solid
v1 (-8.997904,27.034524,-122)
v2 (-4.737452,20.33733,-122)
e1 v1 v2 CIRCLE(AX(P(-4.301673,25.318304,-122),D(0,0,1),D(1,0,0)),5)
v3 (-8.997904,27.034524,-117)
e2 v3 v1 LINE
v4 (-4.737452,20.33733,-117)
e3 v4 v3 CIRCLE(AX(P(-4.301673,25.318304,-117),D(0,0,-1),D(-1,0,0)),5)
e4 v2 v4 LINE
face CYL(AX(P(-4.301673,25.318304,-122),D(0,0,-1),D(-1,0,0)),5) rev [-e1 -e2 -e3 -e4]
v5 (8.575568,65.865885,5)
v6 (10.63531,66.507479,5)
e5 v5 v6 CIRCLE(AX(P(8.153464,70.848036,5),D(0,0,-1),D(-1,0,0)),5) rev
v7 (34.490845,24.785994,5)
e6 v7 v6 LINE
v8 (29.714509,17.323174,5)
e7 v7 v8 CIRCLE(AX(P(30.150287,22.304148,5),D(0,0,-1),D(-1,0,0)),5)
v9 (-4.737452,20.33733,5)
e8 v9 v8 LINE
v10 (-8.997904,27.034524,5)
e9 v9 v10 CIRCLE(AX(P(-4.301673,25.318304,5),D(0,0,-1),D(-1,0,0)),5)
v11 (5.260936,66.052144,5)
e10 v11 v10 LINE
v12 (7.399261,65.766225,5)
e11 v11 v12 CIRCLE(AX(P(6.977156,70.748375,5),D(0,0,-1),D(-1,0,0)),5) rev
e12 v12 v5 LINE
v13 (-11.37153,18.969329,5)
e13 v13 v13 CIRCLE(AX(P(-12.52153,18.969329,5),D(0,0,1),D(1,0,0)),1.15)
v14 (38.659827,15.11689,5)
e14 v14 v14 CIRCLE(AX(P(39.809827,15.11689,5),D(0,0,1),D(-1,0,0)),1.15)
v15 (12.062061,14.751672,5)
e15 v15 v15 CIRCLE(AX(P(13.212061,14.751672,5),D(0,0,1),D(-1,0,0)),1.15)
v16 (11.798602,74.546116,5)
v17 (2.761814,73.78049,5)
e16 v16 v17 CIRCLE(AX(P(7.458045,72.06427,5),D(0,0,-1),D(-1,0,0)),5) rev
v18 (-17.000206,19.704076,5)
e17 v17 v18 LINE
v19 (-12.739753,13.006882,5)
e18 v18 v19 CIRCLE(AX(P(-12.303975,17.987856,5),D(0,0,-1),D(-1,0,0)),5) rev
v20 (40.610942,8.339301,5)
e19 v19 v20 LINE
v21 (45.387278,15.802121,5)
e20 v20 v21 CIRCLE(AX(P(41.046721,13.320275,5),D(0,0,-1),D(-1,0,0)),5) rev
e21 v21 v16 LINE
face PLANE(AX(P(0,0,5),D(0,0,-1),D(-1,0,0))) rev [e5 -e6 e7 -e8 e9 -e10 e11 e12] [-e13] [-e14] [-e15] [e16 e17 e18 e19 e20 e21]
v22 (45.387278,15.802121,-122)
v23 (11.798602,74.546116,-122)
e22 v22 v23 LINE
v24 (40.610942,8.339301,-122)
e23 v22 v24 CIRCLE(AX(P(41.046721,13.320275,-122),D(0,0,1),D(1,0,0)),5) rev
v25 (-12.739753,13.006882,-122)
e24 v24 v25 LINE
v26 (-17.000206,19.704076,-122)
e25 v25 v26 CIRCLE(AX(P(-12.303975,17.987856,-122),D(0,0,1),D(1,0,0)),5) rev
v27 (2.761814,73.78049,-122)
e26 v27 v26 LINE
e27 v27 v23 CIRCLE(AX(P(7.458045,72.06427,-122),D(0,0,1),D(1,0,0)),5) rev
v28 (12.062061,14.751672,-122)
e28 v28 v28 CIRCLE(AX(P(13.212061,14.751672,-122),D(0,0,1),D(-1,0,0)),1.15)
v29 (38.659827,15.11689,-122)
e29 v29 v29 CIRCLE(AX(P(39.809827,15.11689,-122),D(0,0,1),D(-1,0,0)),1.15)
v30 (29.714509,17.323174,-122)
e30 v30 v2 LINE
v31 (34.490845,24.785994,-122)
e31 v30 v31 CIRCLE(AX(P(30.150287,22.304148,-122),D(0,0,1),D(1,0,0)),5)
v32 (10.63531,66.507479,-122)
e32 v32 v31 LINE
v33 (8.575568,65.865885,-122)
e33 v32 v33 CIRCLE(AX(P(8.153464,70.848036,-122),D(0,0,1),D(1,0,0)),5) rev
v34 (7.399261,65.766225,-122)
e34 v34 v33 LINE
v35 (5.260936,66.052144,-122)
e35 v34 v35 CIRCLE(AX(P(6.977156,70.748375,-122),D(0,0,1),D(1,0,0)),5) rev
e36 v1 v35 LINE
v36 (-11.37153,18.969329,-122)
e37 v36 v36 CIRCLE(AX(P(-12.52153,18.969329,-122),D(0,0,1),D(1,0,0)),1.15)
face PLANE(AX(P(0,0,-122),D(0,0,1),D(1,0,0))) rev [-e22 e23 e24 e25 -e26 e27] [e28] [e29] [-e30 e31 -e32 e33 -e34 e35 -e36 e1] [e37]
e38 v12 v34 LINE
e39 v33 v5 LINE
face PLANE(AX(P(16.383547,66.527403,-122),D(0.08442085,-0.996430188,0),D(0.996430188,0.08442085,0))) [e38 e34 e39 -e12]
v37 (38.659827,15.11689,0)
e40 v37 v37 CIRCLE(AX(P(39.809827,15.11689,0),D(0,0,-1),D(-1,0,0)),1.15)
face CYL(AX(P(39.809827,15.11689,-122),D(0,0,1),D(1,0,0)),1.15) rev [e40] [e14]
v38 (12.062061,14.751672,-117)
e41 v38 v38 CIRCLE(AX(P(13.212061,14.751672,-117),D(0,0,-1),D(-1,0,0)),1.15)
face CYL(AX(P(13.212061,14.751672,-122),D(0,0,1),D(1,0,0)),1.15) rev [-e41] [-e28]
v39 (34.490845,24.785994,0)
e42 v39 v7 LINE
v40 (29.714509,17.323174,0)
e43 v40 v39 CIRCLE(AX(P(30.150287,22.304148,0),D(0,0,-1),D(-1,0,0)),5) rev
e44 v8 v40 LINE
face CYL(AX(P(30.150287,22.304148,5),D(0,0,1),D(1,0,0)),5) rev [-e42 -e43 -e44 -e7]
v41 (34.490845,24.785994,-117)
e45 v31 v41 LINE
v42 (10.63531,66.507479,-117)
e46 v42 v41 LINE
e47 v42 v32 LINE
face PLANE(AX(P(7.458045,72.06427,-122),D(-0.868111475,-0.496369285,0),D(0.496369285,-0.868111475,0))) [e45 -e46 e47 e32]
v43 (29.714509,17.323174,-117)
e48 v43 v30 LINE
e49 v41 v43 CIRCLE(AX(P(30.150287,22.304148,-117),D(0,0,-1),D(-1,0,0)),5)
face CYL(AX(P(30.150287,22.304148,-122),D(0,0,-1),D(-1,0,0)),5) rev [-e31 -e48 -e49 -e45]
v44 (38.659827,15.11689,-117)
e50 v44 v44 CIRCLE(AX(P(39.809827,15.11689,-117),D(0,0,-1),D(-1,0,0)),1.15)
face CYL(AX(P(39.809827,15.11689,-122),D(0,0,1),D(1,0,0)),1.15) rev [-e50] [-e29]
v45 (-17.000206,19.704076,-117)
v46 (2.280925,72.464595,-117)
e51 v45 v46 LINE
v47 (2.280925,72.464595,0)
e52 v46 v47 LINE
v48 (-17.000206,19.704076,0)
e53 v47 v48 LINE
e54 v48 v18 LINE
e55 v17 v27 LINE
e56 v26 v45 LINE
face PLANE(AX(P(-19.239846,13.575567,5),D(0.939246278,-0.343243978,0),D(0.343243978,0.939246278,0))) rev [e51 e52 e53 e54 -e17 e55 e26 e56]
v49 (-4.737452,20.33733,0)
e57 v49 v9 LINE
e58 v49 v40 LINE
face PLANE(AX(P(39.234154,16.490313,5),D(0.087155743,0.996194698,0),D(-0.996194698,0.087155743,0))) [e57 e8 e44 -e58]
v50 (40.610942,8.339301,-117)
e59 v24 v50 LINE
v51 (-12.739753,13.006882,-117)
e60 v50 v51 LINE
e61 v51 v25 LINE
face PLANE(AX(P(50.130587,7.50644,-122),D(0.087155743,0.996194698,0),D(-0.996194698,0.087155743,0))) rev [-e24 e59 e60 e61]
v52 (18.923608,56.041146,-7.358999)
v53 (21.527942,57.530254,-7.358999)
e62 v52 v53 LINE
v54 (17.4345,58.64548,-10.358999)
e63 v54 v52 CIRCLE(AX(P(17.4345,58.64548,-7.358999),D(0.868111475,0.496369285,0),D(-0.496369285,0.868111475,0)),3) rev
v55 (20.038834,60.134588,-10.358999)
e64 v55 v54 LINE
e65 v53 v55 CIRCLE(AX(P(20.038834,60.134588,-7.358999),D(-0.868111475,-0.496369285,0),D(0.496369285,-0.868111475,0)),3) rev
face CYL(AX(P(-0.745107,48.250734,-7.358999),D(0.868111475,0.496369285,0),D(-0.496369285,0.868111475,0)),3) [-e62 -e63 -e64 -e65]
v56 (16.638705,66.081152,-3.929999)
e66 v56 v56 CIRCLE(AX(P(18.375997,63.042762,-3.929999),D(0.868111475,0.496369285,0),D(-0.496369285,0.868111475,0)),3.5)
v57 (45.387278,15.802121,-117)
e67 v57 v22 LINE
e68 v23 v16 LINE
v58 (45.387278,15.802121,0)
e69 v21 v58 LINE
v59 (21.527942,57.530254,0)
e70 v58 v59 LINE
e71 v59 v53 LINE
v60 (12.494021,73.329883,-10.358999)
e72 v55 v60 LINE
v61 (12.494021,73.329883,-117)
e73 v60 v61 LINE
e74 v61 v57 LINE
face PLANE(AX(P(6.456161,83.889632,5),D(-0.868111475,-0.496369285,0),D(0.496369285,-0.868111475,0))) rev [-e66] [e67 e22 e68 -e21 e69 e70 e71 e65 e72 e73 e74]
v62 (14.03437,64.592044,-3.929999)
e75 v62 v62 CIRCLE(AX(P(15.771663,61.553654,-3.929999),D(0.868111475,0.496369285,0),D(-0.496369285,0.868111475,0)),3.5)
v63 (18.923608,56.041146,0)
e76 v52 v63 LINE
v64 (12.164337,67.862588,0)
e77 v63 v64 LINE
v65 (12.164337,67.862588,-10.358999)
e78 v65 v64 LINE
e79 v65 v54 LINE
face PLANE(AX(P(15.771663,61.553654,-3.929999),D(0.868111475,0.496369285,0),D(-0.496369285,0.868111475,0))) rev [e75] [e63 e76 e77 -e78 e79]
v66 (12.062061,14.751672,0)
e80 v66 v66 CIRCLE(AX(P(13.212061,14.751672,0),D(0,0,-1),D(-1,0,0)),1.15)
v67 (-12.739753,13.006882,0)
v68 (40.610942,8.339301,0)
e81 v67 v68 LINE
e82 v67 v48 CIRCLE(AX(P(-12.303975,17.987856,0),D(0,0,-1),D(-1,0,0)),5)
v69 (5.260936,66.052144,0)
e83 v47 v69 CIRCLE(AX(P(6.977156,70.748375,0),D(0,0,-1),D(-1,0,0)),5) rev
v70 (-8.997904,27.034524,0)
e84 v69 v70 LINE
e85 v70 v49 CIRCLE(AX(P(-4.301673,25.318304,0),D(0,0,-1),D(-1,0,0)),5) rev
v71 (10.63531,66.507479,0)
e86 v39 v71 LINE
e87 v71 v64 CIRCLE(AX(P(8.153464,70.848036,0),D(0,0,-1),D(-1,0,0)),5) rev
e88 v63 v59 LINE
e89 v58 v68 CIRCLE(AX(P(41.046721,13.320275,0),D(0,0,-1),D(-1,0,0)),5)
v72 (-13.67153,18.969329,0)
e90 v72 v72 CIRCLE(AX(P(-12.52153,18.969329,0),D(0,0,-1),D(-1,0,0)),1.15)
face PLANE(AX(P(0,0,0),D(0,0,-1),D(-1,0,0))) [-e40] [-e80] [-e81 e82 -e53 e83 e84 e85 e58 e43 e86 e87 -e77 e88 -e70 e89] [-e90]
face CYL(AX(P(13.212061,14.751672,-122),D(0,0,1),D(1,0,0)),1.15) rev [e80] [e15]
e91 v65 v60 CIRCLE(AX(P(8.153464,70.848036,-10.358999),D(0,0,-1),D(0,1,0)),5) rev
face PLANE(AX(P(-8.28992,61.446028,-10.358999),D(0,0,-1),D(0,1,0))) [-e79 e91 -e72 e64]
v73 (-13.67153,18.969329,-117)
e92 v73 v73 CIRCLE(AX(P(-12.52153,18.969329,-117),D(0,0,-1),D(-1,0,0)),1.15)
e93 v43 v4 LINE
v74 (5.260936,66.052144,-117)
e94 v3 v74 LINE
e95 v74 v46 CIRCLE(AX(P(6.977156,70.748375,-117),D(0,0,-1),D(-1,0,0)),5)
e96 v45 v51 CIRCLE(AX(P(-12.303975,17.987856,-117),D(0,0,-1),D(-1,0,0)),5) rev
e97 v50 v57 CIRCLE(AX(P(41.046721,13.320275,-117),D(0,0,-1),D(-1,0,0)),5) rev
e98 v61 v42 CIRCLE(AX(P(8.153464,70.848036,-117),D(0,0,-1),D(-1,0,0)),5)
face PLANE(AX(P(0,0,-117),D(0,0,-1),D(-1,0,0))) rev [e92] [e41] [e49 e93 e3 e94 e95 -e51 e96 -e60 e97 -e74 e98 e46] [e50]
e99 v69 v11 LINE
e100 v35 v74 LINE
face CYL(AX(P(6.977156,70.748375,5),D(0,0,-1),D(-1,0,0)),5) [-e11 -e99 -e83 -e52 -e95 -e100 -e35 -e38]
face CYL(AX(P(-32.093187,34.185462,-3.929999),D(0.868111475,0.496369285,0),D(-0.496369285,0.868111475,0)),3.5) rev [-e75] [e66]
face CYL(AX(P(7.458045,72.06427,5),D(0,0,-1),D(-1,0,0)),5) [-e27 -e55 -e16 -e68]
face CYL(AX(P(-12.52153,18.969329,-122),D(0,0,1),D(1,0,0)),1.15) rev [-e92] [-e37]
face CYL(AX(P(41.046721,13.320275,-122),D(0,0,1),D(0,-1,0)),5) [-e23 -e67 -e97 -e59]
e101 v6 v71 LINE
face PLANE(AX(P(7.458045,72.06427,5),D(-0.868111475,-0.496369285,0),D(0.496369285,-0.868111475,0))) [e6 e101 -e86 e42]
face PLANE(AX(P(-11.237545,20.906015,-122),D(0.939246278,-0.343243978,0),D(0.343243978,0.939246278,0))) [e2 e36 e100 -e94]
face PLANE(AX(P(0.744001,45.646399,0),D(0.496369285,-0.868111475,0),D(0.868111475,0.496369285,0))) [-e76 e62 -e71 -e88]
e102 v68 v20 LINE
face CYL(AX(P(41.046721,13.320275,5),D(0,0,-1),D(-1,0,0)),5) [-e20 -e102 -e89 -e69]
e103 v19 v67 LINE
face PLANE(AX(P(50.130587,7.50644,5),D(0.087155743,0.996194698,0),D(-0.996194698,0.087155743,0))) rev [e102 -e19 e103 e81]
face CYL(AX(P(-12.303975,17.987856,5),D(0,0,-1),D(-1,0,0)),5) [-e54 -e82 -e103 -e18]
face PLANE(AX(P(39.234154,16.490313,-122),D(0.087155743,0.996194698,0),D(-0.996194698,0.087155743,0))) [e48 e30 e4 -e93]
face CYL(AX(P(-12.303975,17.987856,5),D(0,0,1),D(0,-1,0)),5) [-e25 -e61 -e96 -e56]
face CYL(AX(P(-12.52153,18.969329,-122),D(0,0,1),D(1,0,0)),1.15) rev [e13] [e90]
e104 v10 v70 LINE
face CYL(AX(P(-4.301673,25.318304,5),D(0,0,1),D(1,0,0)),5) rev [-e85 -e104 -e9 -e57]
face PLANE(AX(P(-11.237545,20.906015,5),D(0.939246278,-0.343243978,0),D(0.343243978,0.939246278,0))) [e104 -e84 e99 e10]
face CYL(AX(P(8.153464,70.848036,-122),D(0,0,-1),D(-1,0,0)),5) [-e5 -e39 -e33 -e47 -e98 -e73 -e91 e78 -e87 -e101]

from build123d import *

# Parameters (mm, degrees)
AUFSATZ_LINEAR_AUSTRAGEN1_DEPTH = 5
AUFSATZ_LINEAR_AUSTRAGEN2_DEPTH = 5
AUFSATZ_LINEAR_AUSTRAGEN3_DEPTH = 127
VERRUNDUNG1_R                   = 5
SKIZZE4_R                       = 1.15
SCHNITT_LINEAR_AUSTRAGEN1_DEPTH = 160.018146459
VERRUNDUNG2_R                   = 5
SKIZZE5_W                       = 10.358999457
SKIZZE5_H                       = 18.2
AUFSATZ_LINEAR_AUSTRAGEN4_DEPTH = 3
SKIZZE6_R                       = 3.5
SCHNITT_LINEAR_AUSTRAGEN2_DEPTH = 146.462570096
VERRUNDUNG4_R                   = 3


with BuildPart() as part:
    # Skizze1 → Aufsatz-Linear austragen1 (new body)
    with BuildSketch(Plane.XY):
        Polygon((-19.239846421, 13.575566883), (6.456161255, 83.889632397), (50.130587288, 7.506440349), align=None)
        Polygon((-11.237544669, 20.906014898), (7.458044946, 72.064269891), (39.234154141, 16.490313423), align=None, mode=Mode.SUBTRACT)
    extrude(amount=AUFSATZ_LINEAR_AUSTRAGEN1_DEPTH)



with BuildPart() as body_2:
    # Skizze2 → Aufsatz-Linear austragen2 (new body)
    with BuildSketch(Plane(origin=(0, 0, -117), x_dir=(-1, 0, 0), z_dir=(0, 0, -1))):
        Polygon((-50.130587288, 7.506440349), (19.239846421, 13.575566883), (-6.456161255, 83.889632397), align=None)
        Polygon((-39.234154141, 16.490313423), (11.237544669, 20.906014898), (-7.458044946, 72.064269891), align=None, mode=Mode.SUBTRACT)
    extrude(amount=AUFSATZ_LINEAR_AUSTRAGEN2_DEPTH)


with BuildPart() as part_1:
    add(part.part)

    add(body_2.part)  # Aufsatz-Linear austragen3 merges body 2
    # Skizze3 → Aufsatz-Linear austragen3 (add, through all)
    with BuildSketch(Plane.XY.offset(5)):
        Polygon((6.456161255, 83.889632397), (-0.408718311, 65.10470683), (16.38354695, 66.527402895), align=None)
    extrude(amount=-AUFSATZ_LINEAR_AUSTRAGEN3_DEPTH)

    # Verrundung1
    verrundung1_edges = [part_1.edges().sort_by_distance(p)[0] for p in [
        (-11.237544669, 20.906014898, 2.5),
        (39.234154141, 16.490313423, 2.5),
        (50.130587288, 7.506440349, -119.5),
        (-19.239846421, 13.575566883, -119.5),
        (39.234154141, 16.490313423, -119.5),
        (-11.237544669, 20.906014898, -119.5),
        (-19.239846421, 13.575566883, 2.5),
        (50.130587288, 7.506440349, 2.5),
    ]]
    fillet(verrundung1_edges, radius=VERRUNDUNG1_R)

    # Skizze4 → Schnitt-Linear austragen1 (cut, through all)
    with BuildSketch(Plane.XY.offset(5)):
        with Locations((-12.521530051, 18.969329152)):
            Circle(SKIZZE4_R)
        with Locations(Location((39.809827396, 15.116890366, 0), (0, 0, 180))):
            Circle(SKIZZE4_R)
        with Locations(Location((13.212061367, 14.751672192, 0), (0, 0, 180))):
            Circle(SKIZZE4_R)
    extrude(amount=-SCHNITT_LINEAR_AUSTRAGEN1_DEPTH, mode=Mode.SUBTRACT)

    # Verrundung2
    # the kernel refuses this fillet: 5 mm, written as the material it takes off along each edge
    with BuildSketch(Plane(origin=(6.456161255, 83.889632397, 31.907592949), x_dir=(-0.34324397830304476, -0.9392462783310345, 0), z_dir=(0, 0, -1))) as verrundung2_piece_1:
        with BuildLine():
            CenterArc((VERRUNDUNG2_R * 2.15260743589, -VERRUNDUNG2_R), VERRUNDUNG2_R, 90, 130.165278403)
            Line((VERRUNDUNG2_R * 1.38842039617, -VERRUNDUNG2_R * 1.64499470411), (0, 0))
            Line((0, 0), (VERRUNDUNG2_R * 2.15260743589, 0))
        make_face()
    extrude(amount=180.815185897, mode=Mode.SUBTRACT)
    with BuildSketch(Plane(origin=(-0.408718311, 65.10470683, 19.589879441), x_dir=(0.34324397830304404, 0.9392462783310347, 0), z_dir=(0, 0, -1))) as verrundung2_piece_2_section:
        with BuildLine():
            CenterArc((VERRUNDUNG2_R * 1.56719035525, VERRUNDUNG2_R), VERRUNDUNG2_R, 155.082639201, 114.917360799)
            Line((VERRUNDUNG2_R * 0.660273957752, VERRUNDUNG2_R * 1.42131063118), (0, 0))
            Line((0, 0), (VERRUNDUNG2_R * 1.56719035525, 0))
        make_face()
    verrundung2_piece_2 = extrude(amount=156.179758881, mode=Mode.PRIVATE)
    verrundung2_piece_2 = split(verrundung2_piece_2, bisect_by=Plane(origin=(5.223636013, 65.950075885, 2.5), z_dir=(0.9392462783310345, -0.34324397830304465, 0)), keep=Keep.TOP, mode=Mode.PRIVATE)
    add(verrundung2_piece_2, mode=Mode.SUBTRACT)
    with BuildSketch(Plane(origin=(-0.408718311, 65.10470683, 0), x_dir=(0.34324397830304504, 0.9392462783310342, 0), z_dir=(0, 0, -1)), Plane(origin=(16.38354695, 66.527402895, 0), x_dir=(-0.9964301882569208, -0.08442085009212626, 0), z_dir=(0, 0, -1))) as verrundung2_piece_3:
        with BuildLine():
            CenterArc((VERRUNDUNG2_R * 1.56719035525, VERRUNDUNG2_R), VERRUNDUNG2_R, 155.082639201, 114.917360799)
            Line((VERRUNDUNG2_R * 0.660273957752, VERRUNDUNG2_R * 1.42131063118), (0, 0))
            Line((0, 0), (VERRUNDUNG2_R * 1.56719035525, 0))
        make_face()
    extrude(amount=117, mode=Mode.SUBTRACT)
    with BuildSketch(Plane(origin=(16.38354695, 66.527402895, 19.589879441), x_dir=(-0.9964301882569208, -0.08442085009212626, 0), z_dir=(0, 0, -1))) as verrundung2_piece_4_section:
        with BuildLine():
            CenterArc((VERRUNDUNG2_R * 1.56719035525, VERRUNDUNG2_R), VERRUNDUNG2_R, 155.082639201, 114.917360799)
            Line((VERRUNDUNG2_R * 0.660273957752, VERRUNDUNG2_R * 1.42131063118), (0, 0))
            Line((0, 0), (VERRUNDUNG2_R * 1.56719035525, 0))
        make_face()
    verrundung2_piece_4 = extrude(amount=156.179758881, mode=Mode.PRIVATE)
    verrundung2_piece_4 = split(verrundung2_piece_4, bisect_by=Plane(origin=(10.689250835, 66.413140789, 2.5), z_dir=(-0.868111475056711, -0.4963692847818663, 0)), keep=Keep.TOP, mode=Mode.PRIVATE)
    add(verrundung2_piece_4, mode=Mode.SUBTRACT)

    # Skizze5 → Aufsatz-Linear austragen4 (add)
    with BuildSketch(Plane(origin=(41.013843737, 23.450919458, 0), x_dir=(0, 0, -1), z_dir=(0.868111475056711, 0.4963692847818664, 0))):
        with Locations((5.179499729, 48.356864154)):
            Rectangle(SKIZZE5_W, SKIZZE5_H)
    extrude(amount=-AUFSATZ_LINEAR_AUSTRAGEN4_DEPTH)

    # Skizze6 → Schnitt-Linear austragen2 (cut, through all)
    with BuildSketch(Plane(origin=(41.013843737, 23.450919458, 0), x_dir=(0, 0, -1), z_dir=(0.868111475056711, 0.4963692847818664, 0))):
        with Locations(Location((3.929999457, 45.606864154, 0), (0, 0, 90))):
            Circle(SKIZZE6_R)
    extrude(amount=-SCHNITT_LINEAR_AUSTRAGEN2_DEPTH, mode=Mode.SUBTRACT)

    # Verrundung4
    verrundung4_edges = [part_1.edges().sort_by_distance(p)[0] for p in [
        (20.225774942, 56.785699777, -10.358999457),
    ]]
    fillet(verrundung4_edges, radius=VERRUNDUNG4_R)


solid = part_1.part
